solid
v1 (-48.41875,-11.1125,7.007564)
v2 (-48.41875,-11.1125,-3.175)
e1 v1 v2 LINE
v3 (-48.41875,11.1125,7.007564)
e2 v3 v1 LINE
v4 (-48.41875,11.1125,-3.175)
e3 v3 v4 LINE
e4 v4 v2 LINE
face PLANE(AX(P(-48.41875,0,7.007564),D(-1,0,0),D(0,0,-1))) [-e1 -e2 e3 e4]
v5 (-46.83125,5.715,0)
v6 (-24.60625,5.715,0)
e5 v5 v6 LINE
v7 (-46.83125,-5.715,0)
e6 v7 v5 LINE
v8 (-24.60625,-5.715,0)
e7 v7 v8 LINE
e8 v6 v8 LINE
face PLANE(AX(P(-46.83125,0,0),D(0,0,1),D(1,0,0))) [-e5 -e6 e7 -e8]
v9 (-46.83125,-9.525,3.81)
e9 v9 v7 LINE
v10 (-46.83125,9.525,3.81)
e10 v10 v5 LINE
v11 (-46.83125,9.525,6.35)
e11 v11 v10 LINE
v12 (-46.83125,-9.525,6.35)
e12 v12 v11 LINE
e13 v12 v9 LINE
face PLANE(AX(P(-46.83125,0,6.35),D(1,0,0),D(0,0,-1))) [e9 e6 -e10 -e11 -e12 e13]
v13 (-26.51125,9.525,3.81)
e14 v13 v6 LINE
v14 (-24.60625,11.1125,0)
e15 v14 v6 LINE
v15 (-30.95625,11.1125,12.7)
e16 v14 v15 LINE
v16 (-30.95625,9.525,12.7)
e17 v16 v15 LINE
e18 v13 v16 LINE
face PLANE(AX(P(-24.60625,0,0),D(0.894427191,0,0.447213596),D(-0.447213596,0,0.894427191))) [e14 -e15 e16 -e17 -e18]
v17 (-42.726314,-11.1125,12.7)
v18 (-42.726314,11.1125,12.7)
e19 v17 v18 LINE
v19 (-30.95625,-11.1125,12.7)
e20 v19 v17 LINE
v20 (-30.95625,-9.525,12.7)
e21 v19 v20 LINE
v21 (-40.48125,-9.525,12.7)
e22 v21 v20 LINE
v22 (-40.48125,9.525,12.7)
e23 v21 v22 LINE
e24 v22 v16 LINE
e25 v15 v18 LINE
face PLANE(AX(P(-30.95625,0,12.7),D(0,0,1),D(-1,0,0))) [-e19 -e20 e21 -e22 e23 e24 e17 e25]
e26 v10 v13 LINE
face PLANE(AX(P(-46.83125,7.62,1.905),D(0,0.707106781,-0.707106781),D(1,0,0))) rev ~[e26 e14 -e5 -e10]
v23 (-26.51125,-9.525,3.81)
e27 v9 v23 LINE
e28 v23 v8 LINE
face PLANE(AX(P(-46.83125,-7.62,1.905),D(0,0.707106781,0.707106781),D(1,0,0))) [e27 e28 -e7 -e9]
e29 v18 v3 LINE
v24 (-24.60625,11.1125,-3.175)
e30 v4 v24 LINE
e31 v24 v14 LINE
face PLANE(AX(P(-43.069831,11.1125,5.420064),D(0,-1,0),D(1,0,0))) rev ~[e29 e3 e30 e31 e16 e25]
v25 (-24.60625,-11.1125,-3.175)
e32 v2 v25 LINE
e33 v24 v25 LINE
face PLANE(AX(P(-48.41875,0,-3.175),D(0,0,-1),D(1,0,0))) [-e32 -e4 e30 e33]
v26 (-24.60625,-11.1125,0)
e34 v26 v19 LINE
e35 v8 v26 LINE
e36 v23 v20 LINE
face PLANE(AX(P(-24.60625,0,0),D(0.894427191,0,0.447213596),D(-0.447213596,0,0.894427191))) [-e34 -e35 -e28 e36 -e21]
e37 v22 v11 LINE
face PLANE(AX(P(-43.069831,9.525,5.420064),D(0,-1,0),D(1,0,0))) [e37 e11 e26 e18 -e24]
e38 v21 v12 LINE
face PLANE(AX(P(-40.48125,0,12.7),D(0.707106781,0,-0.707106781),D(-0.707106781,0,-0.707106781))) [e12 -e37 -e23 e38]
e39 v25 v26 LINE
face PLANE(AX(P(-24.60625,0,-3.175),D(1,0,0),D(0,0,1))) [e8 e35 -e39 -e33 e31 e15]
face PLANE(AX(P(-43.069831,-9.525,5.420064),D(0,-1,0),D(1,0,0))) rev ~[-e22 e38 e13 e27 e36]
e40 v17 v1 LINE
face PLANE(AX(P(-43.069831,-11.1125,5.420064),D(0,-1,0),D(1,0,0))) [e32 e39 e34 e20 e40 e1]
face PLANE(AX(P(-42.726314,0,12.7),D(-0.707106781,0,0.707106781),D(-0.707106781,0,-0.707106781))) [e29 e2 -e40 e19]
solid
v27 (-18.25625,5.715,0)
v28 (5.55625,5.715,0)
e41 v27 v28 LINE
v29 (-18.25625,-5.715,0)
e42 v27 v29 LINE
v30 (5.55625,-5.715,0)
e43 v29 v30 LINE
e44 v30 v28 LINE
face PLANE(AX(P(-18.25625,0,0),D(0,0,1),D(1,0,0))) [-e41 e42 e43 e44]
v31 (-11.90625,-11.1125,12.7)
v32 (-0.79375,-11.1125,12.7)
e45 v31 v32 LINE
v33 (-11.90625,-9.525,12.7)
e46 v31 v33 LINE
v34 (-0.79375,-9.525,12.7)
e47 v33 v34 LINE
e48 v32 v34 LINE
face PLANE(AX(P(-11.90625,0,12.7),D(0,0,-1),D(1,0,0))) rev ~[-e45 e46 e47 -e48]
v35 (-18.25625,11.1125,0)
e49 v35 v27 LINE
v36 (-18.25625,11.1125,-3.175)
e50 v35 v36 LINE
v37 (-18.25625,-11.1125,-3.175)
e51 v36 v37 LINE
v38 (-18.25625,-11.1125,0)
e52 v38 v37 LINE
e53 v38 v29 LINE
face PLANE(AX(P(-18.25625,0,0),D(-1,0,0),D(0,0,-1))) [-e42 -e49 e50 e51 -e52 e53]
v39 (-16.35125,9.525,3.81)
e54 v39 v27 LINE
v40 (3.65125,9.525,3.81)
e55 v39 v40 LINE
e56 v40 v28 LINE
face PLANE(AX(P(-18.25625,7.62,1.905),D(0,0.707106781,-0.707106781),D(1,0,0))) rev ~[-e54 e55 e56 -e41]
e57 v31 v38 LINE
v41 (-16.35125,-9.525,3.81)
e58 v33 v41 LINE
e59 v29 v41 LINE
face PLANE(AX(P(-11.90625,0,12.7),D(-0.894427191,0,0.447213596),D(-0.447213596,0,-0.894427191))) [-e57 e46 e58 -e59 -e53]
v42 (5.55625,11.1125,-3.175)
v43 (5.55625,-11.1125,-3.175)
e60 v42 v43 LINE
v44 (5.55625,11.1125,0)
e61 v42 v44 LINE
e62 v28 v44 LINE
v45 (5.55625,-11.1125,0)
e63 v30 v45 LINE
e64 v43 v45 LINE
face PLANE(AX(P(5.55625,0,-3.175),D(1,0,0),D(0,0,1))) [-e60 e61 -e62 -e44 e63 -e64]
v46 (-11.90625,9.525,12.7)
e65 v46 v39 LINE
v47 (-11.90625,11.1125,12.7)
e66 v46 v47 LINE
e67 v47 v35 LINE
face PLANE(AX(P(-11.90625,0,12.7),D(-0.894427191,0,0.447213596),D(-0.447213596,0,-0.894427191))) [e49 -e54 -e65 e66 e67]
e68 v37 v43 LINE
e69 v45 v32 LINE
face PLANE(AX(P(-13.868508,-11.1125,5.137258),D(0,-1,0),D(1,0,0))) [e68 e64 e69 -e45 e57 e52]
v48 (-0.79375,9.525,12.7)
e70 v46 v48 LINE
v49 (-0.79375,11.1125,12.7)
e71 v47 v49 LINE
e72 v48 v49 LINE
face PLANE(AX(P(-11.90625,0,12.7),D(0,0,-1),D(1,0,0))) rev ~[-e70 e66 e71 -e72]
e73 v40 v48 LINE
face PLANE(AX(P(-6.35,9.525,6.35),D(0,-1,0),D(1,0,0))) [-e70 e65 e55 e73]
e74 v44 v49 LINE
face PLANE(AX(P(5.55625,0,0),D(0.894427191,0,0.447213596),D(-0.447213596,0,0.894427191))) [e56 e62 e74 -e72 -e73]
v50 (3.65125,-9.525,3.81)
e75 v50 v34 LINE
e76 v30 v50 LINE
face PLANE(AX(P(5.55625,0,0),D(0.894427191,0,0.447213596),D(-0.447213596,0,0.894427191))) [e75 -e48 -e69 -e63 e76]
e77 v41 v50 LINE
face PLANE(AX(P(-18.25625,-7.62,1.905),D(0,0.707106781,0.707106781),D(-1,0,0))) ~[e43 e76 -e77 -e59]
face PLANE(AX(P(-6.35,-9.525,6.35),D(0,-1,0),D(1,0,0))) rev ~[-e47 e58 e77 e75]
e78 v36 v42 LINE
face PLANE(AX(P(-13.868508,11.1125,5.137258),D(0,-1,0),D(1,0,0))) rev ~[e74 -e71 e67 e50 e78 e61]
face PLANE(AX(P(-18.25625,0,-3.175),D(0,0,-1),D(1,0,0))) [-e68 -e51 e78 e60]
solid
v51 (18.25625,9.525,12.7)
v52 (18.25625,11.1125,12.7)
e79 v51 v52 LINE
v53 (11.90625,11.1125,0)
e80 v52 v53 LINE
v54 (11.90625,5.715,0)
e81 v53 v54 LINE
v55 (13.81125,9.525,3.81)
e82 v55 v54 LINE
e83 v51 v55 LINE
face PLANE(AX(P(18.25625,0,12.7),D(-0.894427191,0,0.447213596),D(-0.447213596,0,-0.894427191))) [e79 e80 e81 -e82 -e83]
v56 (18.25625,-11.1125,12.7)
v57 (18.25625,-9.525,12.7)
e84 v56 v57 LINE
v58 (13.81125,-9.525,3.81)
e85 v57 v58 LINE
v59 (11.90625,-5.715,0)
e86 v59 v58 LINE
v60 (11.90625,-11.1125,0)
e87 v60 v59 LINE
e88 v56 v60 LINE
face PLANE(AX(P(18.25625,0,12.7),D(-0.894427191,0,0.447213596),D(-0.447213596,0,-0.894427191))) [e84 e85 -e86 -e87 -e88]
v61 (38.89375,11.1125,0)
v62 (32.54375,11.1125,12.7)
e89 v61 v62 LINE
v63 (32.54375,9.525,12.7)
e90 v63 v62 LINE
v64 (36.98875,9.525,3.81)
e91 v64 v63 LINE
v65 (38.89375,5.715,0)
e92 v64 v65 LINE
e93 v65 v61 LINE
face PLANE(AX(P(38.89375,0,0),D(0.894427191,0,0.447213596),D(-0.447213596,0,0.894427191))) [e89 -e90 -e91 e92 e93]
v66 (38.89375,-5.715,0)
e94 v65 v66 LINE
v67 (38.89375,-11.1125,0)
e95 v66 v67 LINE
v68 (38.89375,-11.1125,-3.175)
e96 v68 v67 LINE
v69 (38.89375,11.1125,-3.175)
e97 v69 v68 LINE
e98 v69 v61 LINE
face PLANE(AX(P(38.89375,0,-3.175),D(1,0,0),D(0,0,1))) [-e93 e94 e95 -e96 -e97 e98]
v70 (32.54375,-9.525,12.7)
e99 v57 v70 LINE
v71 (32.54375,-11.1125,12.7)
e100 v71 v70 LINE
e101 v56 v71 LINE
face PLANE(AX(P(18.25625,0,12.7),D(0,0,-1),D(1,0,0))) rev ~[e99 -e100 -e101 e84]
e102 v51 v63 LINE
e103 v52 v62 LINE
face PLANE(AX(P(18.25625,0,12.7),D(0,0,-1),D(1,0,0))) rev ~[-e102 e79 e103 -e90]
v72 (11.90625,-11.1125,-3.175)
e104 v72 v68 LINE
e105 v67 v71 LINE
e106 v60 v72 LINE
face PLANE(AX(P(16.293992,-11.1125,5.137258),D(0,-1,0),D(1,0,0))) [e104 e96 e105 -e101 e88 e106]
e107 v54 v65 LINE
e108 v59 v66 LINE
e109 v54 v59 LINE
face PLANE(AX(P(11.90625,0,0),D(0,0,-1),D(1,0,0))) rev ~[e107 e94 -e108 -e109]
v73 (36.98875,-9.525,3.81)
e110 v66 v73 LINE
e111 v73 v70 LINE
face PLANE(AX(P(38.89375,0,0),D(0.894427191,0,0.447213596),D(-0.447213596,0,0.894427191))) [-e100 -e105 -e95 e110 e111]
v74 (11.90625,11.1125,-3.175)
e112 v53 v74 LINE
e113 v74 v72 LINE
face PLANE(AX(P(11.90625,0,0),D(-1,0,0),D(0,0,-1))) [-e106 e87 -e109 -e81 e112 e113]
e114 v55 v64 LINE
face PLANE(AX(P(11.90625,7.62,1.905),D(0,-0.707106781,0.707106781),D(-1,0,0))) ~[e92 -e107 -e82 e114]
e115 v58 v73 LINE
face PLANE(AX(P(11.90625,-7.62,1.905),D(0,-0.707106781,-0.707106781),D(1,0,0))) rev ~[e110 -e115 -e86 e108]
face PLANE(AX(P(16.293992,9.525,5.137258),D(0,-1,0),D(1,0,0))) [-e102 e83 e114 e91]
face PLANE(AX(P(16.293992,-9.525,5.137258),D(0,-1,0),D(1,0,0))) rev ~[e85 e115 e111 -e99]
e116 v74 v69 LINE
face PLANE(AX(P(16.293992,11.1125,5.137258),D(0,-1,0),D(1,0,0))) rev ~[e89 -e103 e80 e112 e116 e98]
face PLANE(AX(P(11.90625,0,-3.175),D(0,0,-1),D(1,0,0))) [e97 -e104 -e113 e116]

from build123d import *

# Parameters (mm, degrees)
F0_W      = 9.525
F0_H      = 12.7
F1_DEPTH  = 11.1125
F0_W_2    = 11.1125
F0_W_3    = 14.2875
F2_DEPTH  = 9.525
F3_SIZE   = 3.81
F3_2_SIZE = 3.81
F3_3_SIZE = 3.81


# Not quite as in the source:
# - a feature names something its author has since deleted; it is built from what else it names


with BuildPart() as f1:
    # F0 (on Front) → F1 (new body, symmetric)
    with BuildSketch(Plane.XZ):
        Polygon((-46.83125, 0), (-40.48125, 0), (-40.48125, 12.7), (-46.83125, 6.35), align=None)
        Polygon((-30.95625, 0), (-24.60625, 0), (-30.95625, 12.7), align=None)
        Polygon((-48.41875, -3.175), (-46.83125, -3.175), (-46.83125, 0), (-46.83125, 6.35), (-40.48125, 12.7), (-42.7263140303, 12.7), (-48.41875, 7.0075640303), (-48.41875, 6.35), align=None)
        Polygon((-24.60625, -3.175), (-24.60625, 0), (-30.95625, 0), (-40.48125, 0), (-46.83125, 0), (-46.83125, -3.175), align=None)
        with Locations((-35.71875, 6.35)):
            Rectangle(F0_W, F0_H)
    extrude(amount=F1_DEPTH, both=True)


with BuildPart() as f1b:
    # F0 (on Front) → F1, piece 2 (new body, symmetric)
    with BuildSketch(Plane.XZ):
        Polygon((-18.25625, 0), (-11.90625, 0), (-11.90625, 12.7), align=None)
        Polygon((-0.79375, 0), (5.55625, 0), (-0.79375, 12.7), align=None)
        Polygon((5.55625, -3.175), (5.55625, 0), (-0.79375, 0), (-11.90625, 0), (-18.25625, 0), (-18.25625, -3.175), align=None)
        with Locations((-6.35, 6.35)):
            Rectangle(F0_W_2, F0_H)
    extrude(amount=F1_DEPTH, both=True)


with BuildPart() as f1c:
    # F0 (on Front) → F1, piece 3 (new body, symmetric)
    with BuildSketch(Plane.XZ):
        Polygon((18.25625, 12.7), (11.90625, 0), (18.25625, 0), align=None)
        Polygon((32.54375, 0), (38.89375, 0), (32.54375, 12.7), align=None)
        Polygon((11.90625, 0), (11.90625, -3.175), (38.89375, -3.175), (38.89375, 0), (32.54375, 0), (18.25625, 0), align=None)
        with Locations((25.4, 6.35)):
            Rectangle(F0_W_3, F0_H)
    extrude(amount=F1_DEPTH, both=True)


with BuildPart() as f2_tool:
    # F0 (on Front) → F2 (new body, symmetric)
    with BuildSketch(Plane.XZ):
        Polygon((-46.83125, 0), (-40.48125, 0), (-40.48125, 12.7), (-46.83125, 6.35), align=None)
        with Locations((-35.71875, 6.35)):
            Rectangle(F0_W, F0_H)
        Polygon((-30.95625, 0), (-24.60625, 0), (-30.95625, 12.7), align=None)
        with Locations((-6.35, 6.35)):
            Rectangle(F0_W_2, F0_H)
        Polygon((-18.25625, 0), (-11.90625, 0), (-11.90625, 12.7), align=None)
        Polygon((-0.79375, 0), (5.55625, 0), (-0.79375, 12.7), align=None)
        Polygon((18.25625, 12.7), (11.90625, 0), (18.25625, 0), align=None)
        with Locations((25.4, 6.35)):
            Rectangle(F0_W_3, F0_H)
        Polygon((32.54375, 0), (38.89375, 0), (32.54375, 12.7), align=None)
    extrude(amount=F2_DEPTH, both=True)


with BuildPart() as f1_1:
    add(f1.part)

    # F2: cut by f2_tool
    add(f2_tool.part, mode=Mode.SUBTRACT)

    # F3
    f3_edges = [f1_1.edges().sort_by_distance(p)[0] for p in [
        (-35.71875, -9.525, 0),
        (-35.71875, 9.525, 0),
    ]]
    chamfer(f3_edges, length=F3_SIZE)


with BuildPart() as f1b_1:
    add(f1b.part)

    # F2: cut by f2_tool
    add(f2_tool.part, mode=Mode.SUBTRACT)

    # F3#2
    f3_2_edges = [f1b_1.edges().sort_by_distance(p)[0] for p in [
        (-6.35, 9.525, 0),
        (-6.35, -9.525, 0),
    ]]
    chamfer(f3_2_edges, length=F3_2_SIZE)


with BuildPart() as f1c_1:
    add(f1c.part)

    # F2: cut by f2_tool
    add(f2_tool.part, mode=Mode.SUBTRACT)

    # F3#3
    f3_3_edges = [f1c_1.edges().sort_by_distance(p)[0] for p in [
        (25.4, 9.525, 0),
        (25.4, -9.525, 0),
    ]]
    chamfer(f3_3_edges, length=F3_3_SIZE)


solid = Compound([f1_1.part, f1b_1.part, f1c_1.part])
